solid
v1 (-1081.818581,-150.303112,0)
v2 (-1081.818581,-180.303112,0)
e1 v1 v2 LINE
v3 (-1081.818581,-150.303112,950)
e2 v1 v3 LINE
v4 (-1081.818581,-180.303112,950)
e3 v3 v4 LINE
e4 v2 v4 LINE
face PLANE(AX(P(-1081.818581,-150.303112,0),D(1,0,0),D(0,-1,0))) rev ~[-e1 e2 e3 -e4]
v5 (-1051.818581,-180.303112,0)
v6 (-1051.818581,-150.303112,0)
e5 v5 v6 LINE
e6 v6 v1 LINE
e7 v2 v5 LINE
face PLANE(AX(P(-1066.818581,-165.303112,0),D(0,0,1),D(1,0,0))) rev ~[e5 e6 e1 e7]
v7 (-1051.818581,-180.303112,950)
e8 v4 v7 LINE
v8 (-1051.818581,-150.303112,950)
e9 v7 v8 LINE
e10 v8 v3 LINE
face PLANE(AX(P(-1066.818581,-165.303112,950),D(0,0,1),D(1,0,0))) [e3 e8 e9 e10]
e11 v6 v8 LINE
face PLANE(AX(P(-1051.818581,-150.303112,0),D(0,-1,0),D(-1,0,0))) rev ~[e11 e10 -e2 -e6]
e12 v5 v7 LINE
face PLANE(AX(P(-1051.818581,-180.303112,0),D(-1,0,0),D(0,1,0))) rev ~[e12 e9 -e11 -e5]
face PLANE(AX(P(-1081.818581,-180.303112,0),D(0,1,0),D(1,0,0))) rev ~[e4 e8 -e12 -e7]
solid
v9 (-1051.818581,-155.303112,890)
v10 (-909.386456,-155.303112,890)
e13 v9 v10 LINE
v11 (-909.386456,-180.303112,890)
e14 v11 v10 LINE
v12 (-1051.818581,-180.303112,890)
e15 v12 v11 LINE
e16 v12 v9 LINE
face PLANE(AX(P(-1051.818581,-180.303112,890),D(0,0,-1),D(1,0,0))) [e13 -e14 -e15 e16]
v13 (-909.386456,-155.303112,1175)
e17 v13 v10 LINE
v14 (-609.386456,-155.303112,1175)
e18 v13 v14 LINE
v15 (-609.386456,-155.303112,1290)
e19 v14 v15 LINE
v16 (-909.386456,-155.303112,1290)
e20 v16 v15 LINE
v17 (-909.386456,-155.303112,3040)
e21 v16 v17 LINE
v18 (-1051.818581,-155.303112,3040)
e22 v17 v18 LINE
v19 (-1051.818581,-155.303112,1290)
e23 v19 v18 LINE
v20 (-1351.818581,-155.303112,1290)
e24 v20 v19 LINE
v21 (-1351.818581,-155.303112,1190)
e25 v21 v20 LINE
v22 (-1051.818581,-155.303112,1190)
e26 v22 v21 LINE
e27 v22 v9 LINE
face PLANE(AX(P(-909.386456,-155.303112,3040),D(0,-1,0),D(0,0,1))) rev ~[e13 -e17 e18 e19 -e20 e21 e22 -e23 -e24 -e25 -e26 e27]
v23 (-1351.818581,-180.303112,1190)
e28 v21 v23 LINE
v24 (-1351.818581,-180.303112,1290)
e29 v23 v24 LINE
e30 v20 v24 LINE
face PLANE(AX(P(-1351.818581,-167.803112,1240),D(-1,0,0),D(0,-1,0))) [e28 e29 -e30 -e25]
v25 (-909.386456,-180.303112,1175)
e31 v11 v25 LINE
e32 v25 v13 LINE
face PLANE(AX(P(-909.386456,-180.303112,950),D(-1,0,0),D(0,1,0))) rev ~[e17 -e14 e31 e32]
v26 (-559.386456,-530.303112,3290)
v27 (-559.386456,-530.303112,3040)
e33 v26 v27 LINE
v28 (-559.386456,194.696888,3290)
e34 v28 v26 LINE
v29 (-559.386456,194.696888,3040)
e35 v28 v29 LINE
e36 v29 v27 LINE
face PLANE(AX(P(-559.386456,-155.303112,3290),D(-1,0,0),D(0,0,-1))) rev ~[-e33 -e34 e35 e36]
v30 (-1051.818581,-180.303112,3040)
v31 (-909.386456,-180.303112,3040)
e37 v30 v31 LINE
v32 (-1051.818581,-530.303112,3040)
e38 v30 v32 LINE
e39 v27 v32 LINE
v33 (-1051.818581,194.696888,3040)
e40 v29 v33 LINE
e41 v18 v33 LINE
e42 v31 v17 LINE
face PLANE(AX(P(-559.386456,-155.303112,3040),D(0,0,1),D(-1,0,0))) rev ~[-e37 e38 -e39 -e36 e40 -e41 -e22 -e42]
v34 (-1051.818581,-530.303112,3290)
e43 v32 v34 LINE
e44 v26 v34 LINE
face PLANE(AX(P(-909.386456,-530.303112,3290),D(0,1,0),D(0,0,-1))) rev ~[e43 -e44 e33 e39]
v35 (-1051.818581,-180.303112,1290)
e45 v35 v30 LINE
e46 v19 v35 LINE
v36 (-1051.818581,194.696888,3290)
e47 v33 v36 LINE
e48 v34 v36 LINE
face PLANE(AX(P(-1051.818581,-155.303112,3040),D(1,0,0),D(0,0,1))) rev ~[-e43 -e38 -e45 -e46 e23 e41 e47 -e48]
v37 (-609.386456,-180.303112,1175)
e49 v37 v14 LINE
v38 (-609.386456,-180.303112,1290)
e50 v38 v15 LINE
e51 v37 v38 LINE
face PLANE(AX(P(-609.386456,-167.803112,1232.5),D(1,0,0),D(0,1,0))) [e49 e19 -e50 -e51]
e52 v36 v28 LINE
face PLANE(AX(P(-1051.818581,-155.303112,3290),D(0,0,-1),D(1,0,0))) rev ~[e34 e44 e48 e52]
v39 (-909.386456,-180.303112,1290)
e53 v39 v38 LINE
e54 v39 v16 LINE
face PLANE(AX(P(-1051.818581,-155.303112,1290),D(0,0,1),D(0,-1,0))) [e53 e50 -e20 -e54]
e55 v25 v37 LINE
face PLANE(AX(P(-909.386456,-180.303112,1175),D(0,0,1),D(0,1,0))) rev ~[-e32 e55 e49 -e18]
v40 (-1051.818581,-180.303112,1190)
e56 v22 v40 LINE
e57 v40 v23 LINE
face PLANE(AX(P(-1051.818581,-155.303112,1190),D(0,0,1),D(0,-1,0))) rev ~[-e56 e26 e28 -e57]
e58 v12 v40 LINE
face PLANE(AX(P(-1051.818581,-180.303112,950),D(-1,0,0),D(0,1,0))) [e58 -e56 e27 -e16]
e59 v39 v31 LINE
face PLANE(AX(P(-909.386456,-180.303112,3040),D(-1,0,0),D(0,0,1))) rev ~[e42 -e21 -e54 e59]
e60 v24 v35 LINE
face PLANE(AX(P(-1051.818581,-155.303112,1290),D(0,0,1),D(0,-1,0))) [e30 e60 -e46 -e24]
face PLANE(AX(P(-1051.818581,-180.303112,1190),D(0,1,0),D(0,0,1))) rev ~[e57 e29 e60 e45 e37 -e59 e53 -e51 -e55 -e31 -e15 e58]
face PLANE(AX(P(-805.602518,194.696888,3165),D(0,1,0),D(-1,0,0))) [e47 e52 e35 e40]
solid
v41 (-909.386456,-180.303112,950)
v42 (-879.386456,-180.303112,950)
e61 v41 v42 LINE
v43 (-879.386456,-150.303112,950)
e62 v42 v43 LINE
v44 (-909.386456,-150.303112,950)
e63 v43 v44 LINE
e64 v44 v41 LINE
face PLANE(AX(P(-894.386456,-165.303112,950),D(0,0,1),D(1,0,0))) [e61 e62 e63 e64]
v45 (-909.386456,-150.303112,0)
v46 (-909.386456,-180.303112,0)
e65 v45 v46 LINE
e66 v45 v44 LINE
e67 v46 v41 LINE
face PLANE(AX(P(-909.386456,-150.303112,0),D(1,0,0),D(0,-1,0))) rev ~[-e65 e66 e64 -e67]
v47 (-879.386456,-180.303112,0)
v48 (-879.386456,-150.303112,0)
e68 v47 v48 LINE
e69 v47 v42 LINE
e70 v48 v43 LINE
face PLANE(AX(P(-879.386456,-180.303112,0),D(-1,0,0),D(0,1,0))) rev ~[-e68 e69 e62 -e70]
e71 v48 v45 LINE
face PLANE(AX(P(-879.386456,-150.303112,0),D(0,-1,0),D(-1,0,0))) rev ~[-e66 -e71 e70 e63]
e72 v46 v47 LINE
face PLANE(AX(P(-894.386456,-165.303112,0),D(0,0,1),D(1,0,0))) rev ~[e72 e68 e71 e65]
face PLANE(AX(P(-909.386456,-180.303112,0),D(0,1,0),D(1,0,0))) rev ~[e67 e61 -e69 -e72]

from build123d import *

# Parameters (mm, degrees)
F1_DEPTH  = 950
F2_W      = 142.4321246147
F2_H      = 60
F3_DEPTH  = 25
F4_W      = 142.4321246147
F4_H      = 25
F5_DEPTH  = 340
F6_W      = 25
F6_H      = 115
F7_DEPTH  = 300
F8_W      = 25
F8_H      = 100
F9_DEPTH  = 300
F11_DEPTH = 2000
F12_W     = 142.4321246147
F12_H     = 250
F13_DEPTH = 350
F15_DEPTH = 350
F17_DEPTH = 350


with BuildPart() as f1:
    # F0 (on Top) → F1 (new body)
    with BuildSketch(Plane.XY):
        Polygon((-909.3864560127, -150.3031116724), (-909.3864560127, -160.3031116724), (-909.3864560127, -170.3031116724), (-909.3864560127, -180.3031116724), (-879.3864560127, -180.3031116724), (-879.3864560127, -150.3031116724), align=None)
    extrude(amount=F1_DEPTH)


with BuildPart() as f1b:
    # F0 (on Top) → F1, piece 2 (new body)
    with BuildSketch(Plane.XY):
        Polygon((-1051.8185806274, -150.3031116724), (-1081.8185806274, -150.3031116724), (-1081.8185806274, -180.3031116724), (-1051.8185806274, -180.3031116724), (-1051.8185806274, -170.3031116724), (-1051.8185806274, -165.3031116724), (-1051.8185806274, -160.3031116724), align=None)
    extrude(amount=F1_DEPTH)


with BuildPart() as f3:
    # F2 (on face) → F3 (new body)
    with BuildSketch(Plane.XZ.offset(180.3031116724)):
        with Locations((-980.6025183201, 920)):
            Rectangle(F2_W, F2_H)
    extrude(amount=-F3_DEPTH)

    # F4 (on face) → F5 (join)
    with BuildSketch(Plane.XY.offset(950)):
        with Locations((-980.6025183201, -167.8031116724)):
            Rectangle(F4_W, F4_H)
    extrude(amount=F5_DEPTH)

    # F6 (on face) → F7 (join)
    with BuildSketch(Plane.YZ.offset(-909.3864560127)):
        with Locations((-167.8031116724, 1232.5)):
            Rectangle(F6_W, F6_H)
    extrude(amount=F7_DEPTH)

    # F8 (on face) → F9 (join)
    with BuildSketch(Plane(origin=(-1051.8185806274, 0, 0), x_dir=(0, -1, 0), z_dir=(-1, 0, 0))):
        with Locations((167.8031116724, 1240)):
            Rectangle(F8_W, F8_H)
    extrude(amount=F9_DEPTH)

    # F10 (on face) → F11 (join)
    with BuildSketch(Plane.XY.offset(1290)):
        Polygon((-1051.8185806274, -180.3031116724), (-909.3864560127, -180.3031116724), (-1051.8185806274, -155.3031116724), align=None)
        Polygon((-1051.8185806274, -155.3031116724), (-909.3864560127, -180.3031116724), (-909.3864560127, -155.3031116724), align=None)
    extrude(amount=F11_DEPTH)

    # F12 (on face) → F13 (join)
    with BuildSketch(Plane.XZ.offset(180.3031116724)):
        with Locations((-980.6025183201, 3165)):
            Rectangle(F12_W, F12_H)
    extrude(amount=F13_DEPTH)

    # F14 (on face) → F15 (join)
    with BuildSketch(Plane.YZ.offset(-909.3864560127)):
        Polygon((-530.3031116724, 3040), (-180.3031116724, 3040), (-155.3031116724, 3040), (-155.3031116724, 3290), (-530.3031116724, 3290), align=None)
    extrude(amount=F15_DEPTH)

    # F16 (on face) → F17 (join)
    with BuildSketch(Plane(origin=(0, -155.3031116724, 0), x_dir=(-1, 0, 0), z_dir=(0, 1, 0))):
        Polygon((559.3864560127, 3040), (909.3864560127, 3040), (1051.8185806274, 3040), (1051.8185806274, 3290), (559.3864560127, 3290), align=None)
    extrude(amount=F17_DEPTH)


solid = Compound([f1.part, f1b.part, f3.part])
